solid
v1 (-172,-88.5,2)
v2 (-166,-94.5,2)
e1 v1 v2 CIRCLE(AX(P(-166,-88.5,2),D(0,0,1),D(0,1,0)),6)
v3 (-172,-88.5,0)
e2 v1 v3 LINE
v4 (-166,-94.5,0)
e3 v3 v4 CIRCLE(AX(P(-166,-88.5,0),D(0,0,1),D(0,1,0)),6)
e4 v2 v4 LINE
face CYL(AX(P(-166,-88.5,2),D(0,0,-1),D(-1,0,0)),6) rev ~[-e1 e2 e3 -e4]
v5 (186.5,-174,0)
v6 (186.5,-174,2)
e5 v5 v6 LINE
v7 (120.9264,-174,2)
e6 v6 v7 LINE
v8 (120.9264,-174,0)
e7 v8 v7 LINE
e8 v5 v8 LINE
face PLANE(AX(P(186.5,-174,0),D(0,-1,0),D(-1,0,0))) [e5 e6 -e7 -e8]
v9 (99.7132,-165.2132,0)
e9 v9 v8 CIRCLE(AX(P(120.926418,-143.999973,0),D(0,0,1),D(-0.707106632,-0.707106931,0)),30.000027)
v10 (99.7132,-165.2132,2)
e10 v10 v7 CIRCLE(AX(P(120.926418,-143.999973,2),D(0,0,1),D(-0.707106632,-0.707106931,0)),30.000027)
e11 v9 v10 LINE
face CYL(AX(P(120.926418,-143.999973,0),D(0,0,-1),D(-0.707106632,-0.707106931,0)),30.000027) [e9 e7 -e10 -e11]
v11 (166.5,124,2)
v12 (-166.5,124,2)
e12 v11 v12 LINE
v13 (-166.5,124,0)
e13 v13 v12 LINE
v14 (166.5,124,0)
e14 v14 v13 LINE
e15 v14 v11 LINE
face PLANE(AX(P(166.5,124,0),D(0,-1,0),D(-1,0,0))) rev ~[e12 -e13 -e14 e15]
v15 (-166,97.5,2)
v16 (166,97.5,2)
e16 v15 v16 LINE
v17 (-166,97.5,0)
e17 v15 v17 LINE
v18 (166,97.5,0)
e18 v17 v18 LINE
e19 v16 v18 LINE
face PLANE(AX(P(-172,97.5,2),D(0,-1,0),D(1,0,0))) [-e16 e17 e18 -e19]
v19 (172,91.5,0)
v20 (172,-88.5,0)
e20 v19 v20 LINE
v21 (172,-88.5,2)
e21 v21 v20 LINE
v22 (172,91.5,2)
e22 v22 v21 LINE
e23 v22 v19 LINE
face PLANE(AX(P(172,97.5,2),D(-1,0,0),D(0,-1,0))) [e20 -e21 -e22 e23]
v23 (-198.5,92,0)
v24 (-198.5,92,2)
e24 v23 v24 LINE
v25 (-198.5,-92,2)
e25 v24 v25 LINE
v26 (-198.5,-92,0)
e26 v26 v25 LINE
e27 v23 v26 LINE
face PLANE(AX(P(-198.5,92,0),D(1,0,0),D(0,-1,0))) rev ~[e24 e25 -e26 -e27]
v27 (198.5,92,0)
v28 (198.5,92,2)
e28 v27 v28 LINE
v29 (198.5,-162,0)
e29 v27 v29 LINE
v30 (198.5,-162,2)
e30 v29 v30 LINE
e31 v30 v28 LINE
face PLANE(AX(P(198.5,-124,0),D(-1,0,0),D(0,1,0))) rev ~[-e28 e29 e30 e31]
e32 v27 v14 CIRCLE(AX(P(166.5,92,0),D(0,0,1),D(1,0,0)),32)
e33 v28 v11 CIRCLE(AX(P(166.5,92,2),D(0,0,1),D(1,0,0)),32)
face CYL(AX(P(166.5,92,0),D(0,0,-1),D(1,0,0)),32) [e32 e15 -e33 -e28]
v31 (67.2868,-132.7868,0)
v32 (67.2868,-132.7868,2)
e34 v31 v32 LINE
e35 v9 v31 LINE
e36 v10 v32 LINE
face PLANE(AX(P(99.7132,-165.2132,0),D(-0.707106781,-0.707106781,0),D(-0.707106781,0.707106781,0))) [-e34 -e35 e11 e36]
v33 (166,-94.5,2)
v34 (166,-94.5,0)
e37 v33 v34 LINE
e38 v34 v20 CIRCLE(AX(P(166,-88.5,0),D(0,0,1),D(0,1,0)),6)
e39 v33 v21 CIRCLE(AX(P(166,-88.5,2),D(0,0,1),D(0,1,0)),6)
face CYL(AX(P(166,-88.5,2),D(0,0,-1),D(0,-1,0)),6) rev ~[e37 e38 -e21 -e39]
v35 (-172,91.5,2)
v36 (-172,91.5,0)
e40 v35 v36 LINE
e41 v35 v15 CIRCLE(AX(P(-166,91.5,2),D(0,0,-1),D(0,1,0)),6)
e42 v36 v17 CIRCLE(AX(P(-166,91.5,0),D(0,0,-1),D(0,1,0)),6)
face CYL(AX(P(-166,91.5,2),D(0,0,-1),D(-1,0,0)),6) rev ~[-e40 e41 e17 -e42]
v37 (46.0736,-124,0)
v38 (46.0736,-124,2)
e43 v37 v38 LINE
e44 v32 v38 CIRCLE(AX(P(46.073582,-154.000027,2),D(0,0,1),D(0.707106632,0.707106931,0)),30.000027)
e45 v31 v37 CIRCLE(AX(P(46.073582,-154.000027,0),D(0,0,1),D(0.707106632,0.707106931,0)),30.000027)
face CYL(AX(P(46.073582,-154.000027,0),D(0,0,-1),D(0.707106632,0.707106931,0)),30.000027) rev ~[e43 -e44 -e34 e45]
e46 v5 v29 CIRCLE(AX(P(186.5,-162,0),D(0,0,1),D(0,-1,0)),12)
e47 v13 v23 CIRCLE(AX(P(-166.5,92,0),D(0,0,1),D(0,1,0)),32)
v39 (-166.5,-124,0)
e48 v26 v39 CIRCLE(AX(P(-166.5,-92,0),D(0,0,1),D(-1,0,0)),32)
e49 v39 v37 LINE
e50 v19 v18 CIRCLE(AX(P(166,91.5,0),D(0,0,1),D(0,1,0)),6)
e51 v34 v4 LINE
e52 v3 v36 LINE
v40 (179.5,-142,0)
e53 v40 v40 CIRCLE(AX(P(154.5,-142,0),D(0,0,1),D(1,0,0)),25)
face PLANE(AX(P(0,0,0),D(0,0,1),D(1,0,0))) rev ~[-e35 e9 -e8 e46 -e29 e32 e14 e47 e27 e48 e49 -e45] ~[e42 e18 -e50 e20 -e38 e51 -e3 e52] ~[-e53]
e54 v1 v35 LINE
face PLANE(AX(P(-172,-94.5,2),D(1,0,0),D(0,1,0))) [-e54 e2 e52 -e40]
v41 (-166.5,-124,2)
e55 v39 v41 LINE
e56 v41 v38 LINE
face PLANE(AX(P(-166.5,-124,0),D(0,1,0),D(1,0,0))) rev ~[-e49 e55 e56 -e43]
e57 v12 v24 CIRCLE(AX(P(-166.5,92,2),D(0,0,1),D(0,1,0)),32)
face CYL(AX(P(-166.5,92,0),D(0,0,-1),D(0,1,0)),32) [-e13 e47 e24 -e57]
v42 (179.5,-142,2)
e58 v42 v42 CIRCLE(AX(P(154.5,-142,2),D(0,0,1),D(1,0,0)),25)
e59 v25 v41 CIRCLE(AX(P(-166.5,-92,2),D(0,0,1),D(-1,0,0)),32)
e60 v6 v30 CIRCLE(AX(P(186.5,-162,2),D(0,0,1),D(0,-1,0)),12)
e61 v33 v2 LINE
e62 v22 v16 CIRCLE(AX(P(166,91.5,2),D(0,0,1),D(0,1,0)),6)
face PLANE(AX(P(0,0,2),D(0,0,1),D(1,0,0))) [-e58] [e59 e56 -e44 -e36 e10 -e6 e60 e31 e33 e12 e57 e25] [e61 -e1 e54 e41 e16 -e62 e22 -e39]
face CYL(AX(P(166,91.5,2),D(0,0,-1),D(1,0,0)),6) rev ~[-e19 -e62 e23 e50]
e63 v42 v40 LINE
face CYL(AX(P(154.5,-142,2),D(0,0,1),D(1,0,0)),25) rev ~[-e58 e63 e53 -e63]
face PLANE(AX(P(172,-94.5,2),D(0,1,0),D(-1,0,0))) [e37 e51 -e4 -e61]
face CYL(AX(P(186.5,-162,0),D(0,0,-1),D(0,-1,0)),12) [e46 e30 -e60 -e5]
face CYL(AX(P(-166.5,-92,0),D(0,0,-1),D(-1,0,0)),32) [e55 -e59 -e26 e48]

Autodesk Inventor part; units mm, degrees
ref_plane "YZ Plane" through (0, 0, 0) normal (1, 0, 0) x (0, 1, 0)
ref_plane "XZ Plane" through (0, 0, 0) normal (0, 1, 0) x (-1, 0, 0)
ref_plane "XY Plane" through (0, 0, 0) normal (0, 0, 1) x (1, 0, 0)
sketch "Эскиз1" plane through (0, 0, 0) normal (0, 0, 1) x (1, 0, 0)
  line L0 (-166.5, -124) -> (46.0736, -124)
  line L1 (198.5, -124) -> (198.5, 92)
  line L2 (166.5, 124) -> (-166.5, 124)
  line L3 (-198.5, 92) -> (-198.5, -92)
  line L4 (-198.5, -124) -> (198.5, 124) construction
  line L5 (198.5, -124) -> (-198.5, 124) construction
  arc A0 (-166.5, 124) -> (-198.5, 92) centre (-166.5, 92) ccw
  arc A1 (198.5, 92) -> (166.5, 124) centre (166.5, 92) ccw
  arc A2 (-198.5, -92) -> (-166.5, -124) centre (-166.5, -92) ccw
  line L6 (198.5, -124) -> (198.5, -162)
  line L7 (186.5, -174) -> (120.9264, -174)
  line L8 (99.7132, -165.2132) -> (67.2868, -132.7868)
  arc A3 (186.5, -174) -> (198.5, -162) centre (186.5, -162) ccw
  arc A4 (99.7132, -165.2132) -> (120.9264, -174) centre (120.9264, -144) ccw
  arc A5 (67.2868, -132.7868) -> (46.0736, -124) centre (46.0736, -154) ccw
  point P0 (0, 0)
  point P1 (198.5, -174)
  point P2 (108.5, -174)
  dimension "d2" = 397
  dimension "d3" = 248
  dimension "d4" = 32
  dimension "d5" = 298
  dimension "d6" = 12
  dimension "d7" = 50
  dimension "d8" = 90
  dimension "d9" = 135
  dimension "d10" = 30
extrude "Пластина1" add sketch "Эскиз1" along normal blind 2
sketch "Эскиз5" plane through (0, 0, 2) normal (0, 0, 1) x (1, 0, 0)
  line L0 (198.5, 92) -> (198.5, -162) projected
  arc A0 (198.5, 92) -> (166.5, 124) centre (166.5, 92) ccw projected
  line L1 (-166.5, 124) -> (166.5, 124) projected
  arc A1 (-166.5, 124) -> (-198.5, 92) centre (-166.5, 92) ccw projected
  line L2 (-198.5, -92) -> (-198.5, 92) projected
  arc A2 (-198.5, -92) -> (-166.5, -124) centre (-166.5, -92) ccw projected
  line L3 (46.0736, -124) -> (-166.5, -124) projected
  arc A3 (67.2868, -132.7868) -> (46.0736, -124) centre (46.0736, -154) ccw projected
  line L4 (99.7132, -165.2132) -> (67.2868, -132.7868) projected
  arc A4 (99.7132, -165.2132) -> (120.9264, -174) centre (120.9264, -144) ccw projected
  line L5 (186.5, -174) -> (120.9264, -174) projected
  arc A5 (186.5, -174) -> (198.5, -162) centre (186.5, -162) ccw projected
  circle A6 centre (154.5, -142) radius 25
  line L6 (-172, 97.5) -> (172, 97.5)
  line L7 (172, 97.5) -> (172, -94.5)
  line L8 (172, -94.5) -> (-172, -94.5)
  line L9 (-172, -94.5) -> (-172, 97.5)
  point P0 (0, 0)
  dimension "d57" = 50
  dimension "d58" = 26.5
  dimension "d59" = 26.5
  dimension "d60" = 26.5
  dimension "d61" = 29.5
  dimension "d62" = 44
  dimension "d63" = 32
extrude "Вырез4" cut sketch "Эскиз5" against normal blind 2 contours A6 | L6 L7 L8 L9
fillet "УглСкругление1" radius 6 4 edges at (-172, 97.5, 1) (172, 97.5, 1) (172, -94.5, 1) (-172, -94.5, 1)
equation "\"d59\" = d60"
equation "\"d64\" = Толщина"
equation "\"d12\" = Толщина"
equation "\"Радиус_гибки\" = Толщина"
equation "\"Ширина_просечки\" = Толщина"
equation "\"Глубина_просечки\" = 0.5 * Толщина"
equation "\"Размер_просечки\" = 4 * Толщина"
equation "\"Мин_остаток\" = 2 * Толщина"
equation "\"Радиус_перехода\" = Радиус_гибки"
equation "\"Радиус_Якоби\" = Радиус_гибки"
equation "\"Размер_зазора\" = Толщина"
equation "\"Толщина\" = 2"
properties part number "Стекло"
